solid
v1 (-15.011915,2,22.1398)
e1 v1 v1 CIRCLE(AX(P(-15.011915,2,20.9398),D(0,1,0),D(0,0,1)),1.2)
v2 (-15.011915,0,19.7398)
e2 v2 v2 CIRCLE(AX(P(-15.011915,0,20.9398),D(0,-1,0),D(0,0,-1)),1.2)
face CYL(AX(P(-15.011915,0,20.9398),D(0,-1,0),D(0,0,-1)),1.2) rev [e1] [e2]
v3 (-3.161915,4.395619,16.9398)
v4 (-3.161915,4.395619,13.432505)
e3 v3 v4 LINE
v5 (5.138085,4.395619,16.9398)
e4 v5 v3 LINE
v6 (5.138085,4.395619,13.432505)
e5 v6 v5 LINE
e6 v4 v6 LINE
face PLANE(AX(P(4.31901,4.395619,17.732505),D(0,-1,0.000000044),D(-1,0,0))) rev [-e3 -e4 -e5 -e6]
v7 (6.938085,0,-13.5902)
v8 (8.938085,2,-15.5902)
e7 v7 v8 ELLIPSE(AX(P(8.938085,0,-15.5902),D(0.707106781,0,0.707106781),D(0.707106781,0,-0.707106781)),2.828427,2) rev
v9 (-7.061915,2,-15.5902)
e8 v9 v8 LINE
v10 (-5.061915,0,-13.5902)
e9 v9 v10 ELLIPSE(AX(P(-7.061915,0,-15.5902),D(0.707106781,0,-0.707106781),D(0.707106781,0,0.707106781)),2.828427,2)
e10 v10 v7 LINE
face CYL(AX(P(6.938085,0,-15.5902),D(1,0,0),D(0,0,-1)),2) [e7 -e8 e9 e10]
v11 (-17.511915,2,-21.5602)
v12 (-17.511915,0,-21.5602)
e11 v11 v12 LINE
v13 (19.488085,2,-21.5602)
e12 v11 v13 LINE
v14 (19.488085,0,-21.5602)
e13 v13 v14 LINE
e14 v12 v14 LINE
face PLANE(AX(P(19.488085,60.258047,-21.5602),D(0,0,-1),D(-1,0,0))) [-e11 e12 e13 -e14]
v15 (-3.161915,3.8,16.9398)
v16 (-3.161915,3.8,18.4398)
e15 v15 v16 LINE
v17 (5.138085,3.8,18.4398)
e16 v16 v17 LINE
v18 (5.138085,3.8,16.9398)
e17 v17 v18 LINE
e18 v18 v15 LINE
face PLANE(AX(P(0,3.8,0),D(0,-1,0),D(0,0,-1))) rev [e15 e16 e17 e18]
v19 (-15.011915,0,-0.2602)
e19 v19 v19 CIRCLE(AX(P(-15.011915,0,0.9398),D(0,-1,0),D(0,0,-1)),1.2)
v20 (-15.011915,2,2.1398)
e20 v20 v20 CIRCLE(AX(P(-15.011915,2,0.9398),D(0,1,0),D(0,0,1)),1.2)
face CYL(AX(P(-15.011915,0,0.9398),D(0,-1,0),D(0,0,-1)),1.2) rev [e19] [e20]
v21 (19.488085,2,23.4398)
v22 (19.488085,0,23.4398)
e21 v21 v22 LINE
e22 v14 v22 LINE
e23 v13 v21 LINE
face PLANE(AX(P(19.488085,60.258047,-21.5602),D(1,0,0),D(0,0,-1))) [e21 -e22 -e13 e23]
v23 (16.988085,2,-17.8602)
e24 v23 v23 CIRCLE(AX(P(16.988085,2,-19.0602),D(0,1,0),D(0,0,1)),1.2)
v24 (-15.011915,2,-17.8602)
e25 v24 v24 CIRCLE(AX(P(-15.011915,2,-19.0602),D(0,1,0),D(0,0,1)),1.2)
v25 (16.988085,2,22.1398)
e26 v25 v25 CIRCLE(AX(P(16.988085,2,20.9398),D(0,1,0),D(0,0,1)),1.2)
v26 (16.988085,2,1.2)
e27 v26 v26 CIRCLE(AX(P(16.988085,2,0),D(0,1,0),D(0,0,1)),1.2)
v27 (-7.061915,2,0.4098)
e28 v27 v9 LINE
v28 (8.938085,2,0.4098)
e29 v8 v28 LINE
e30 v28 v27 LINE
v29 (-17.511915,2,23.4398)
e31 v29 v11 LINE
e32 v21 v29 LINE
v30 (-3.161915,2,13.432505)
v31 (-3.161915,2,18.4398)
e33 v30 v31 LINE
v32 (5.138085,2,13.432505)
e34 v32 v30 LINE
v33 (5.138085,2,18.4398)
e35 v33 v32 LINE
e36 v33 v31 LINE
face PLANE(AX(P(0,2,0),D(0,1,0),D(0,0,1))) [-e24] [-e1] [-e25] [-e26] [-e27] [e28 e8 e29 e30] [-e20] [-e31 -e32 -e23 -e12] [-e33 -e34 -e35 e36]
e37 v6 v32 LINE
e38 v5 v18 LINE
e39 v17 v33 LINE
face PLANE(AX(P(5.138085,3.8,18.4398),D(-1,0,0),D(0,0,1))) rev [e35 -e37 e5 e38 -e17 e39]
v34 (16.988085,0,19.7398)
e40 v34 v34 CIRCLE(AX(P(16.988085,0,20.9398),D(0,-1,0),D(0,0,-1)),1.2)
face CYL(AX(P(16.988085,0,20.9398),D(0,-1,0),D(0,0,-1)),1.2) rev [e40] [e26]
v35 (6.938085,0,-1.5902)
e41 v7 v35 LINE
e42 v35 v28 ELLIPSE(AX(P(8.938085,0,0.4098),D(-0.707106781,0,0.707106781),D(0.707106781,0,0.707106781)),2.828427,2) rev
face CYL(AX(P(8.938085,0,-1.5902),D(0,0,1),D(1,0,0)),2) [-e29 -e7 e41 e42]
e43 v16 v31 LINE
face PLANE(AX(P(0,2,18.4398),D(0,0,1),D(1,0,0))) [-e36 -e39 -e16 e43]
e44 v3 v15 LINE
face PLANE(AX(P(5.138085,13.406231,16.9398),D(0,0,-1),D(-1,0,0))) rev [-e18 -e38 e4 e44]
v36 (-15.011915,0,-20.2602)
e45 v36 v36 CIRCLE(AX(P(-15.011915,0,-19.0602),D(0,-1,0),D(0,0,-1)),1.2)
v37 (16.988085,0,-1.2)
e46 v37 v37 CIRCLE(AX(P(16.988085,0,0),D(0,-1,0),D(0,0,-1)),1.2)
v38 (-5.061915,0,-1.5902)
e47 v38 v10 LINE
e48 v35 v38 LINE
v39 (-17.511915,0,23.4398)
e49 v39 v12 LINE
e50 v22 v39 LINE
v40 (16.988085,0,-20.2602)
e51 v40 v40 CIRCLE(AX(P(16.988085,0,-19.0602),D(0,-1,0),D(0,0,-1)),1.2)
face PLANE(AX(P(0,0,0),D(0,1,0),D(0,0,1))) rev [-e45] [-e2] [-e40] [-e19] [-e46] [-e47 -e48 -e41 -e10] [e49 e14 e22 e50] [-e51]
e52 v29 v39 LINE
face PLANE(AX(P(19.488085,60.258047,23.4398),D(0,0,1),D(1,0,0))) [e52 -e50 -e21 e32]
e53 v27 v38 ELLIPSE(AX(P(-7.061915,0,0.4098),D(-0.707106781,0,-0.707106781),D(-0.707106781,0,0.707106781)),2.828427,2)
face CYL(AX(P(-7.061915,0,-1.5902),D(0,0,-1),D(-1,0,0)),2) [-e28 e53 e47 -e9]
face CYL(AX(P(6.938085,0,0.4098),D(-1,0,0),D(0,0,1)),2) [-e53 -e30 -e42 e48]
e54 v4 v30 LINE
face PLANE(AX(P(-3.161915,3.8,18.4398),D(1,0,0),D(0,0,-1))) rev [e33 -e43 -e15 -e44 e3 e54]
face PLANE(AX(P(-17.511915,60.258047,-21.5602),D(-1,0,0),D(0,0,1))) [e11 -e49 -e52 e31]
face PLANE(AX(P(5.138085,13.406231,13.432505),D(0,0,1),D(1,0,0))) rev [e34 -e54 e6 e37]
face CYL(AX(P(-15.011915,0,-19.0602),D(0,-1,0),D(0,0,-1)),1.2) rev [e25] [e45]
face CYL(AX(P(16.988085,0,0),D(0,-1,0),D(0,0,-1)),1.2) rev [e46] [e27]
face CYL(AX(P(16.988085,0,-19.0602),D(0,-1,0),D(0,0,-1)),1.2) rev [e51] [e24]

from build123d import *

# Parameters (mm, degrees)
SKETCH1_W            = 27
SKETCH1_H            = 35
SKETCH1_R            = 1.113712744
SKETCH1_R_2          = 1.000106258
SKETCH1_R_3          = 1.174626552
SKETCH1_R_4          = 1.19920455
SKETCH1_W_2          = 8.3
SKETCH1_H_2          = 2.12
BOSS_EXTRUDE1_DEPTH  = 2
CUT_EXTRUDE2_REACH   = 25.536
SKETCH10_W           = 12
SKETCH10_H           = 12
FILLET1_R            = 2
SKETCH12_W           = 8.3
SKETCH12_H           = 1.5
BOSS_EXTRUDE5_DEPTH  = 1.8
SKETCH13_W           = 8.3
SKETCH13_H           = 3.507295064
BOSS_EXTRUDE6_DEPTH  = 2.395619389
SKETCH14_W           = 37
SKETCH14_H           = 45
SKETCH14_W_2         = 27
SKETCH14_H_2         = 35
BOSS_EXTRUDE7_DEPTH  = 2
M2_CLEARANCE_HOLE3_D = 2.4


with BuildPart() as part:
    # Sketch1 → Boss-Extrude1 (new body)
    # profile 1 of 8: a face of its own
    with BuildSketch(Plane(origin=(0, 0, 0), x_dir=(1, 0, 0), z_dir=(0, 1, 0))):
        with Locations((0.988085162, -0.939800033)):
            Rectangle(SKETCH1_W, SKETCH1_H)
        Polygon((-10.011914838, -15.939800033), (-10.011914838, 14.060199967), (11.988085162, 14.060199967), (11.988085162, -15.939800033), (5.138085162, -15.939800033), (5.138085162, -18.059800033), (-3.161914838, -18.059800033), (-3.161914838, -15.939800033), align=None, mode=Mode.SUBTRACT)
    # profile 2 of 8: a face of its own
    with BuildSketch(Plane(origin=(0, 0, 0), x_dir=(1, 0, 0), z_dir=(0, 1, 0))):
        Polygon((11.988085162, 14.060199967), (-10.011914838, 14.060199967), (-10.011914838, -15.939800033), (-3.161914838, -15.939800033), (-3.161914838, -13.819800033), (5.138085162, -13.819800033), (5.138085162, -15.939800033), (11.988085162, -15.939800033), align=None)
        with Locations((-8.011914838, -13.939800033)):
            Circle(SKETCH1_R, mode=Mode.SUBTRACT)
        with Locations((9.988085162, -14.291814947)):
            Circle(SKETCH1_R_2, mode=Mode.SUBTRACT)
        with Locations((-8.011914838, 7.560199967)):
            Circle(SKETCH1_R_3, mode=Mode.SUBTRACT)
        with Locations((9.988085162, 7.560199967)):
            Circle(SKETCH1_R_4, mode=Mode.SUBTRACT)
    # profile 3 of 8: a face of its own
    with BuildSketch(Plane(origin=(0, 0, 0), x_dir=(1, 0, 0), z_dir=(0, 1, 0))):
        with Locations((-8.011914838, 7.560199967)):
            Circle(SKETCH1_R_3)
    # profile 4 of 8: a face of its own
    with BuildSketch(Plane(origin=(0, 0, 0), x_dir=(1, 0, 0), z_dir=(0, 1, 0))):
        with Locations((9.988085162, 7.560199967)):
            Circle(SKETCH1_R_4)
    # profile 5 of 8: a face of its own
    with BuildSketch(Plane(origin=(0, 0, 0), x_dir=(1, 0, 0), z_dir=(0, 1, 0))):
        with Locations((9.988085162, -14.291814947)):
            Circle(SKETCH1_R_2)
    # profile 6 of 8: a face of its own
    with BuildSketch(Plane(origin=(0, 0, 0), x_dir=(1, 0, 0), z_dir=(0, 1, 0))):
        with Locations((0.988085162, -16.999800033)):
            Rectangle(SKETCH1_W_2, SKETCH1_H_2)
    # profile 7 of 8: a face of its own
    with BuildSketch(Plane(origin=(0, 0, 0), x_dir=(1, 0, 0), z_dir=(0, 1, 0))):
        with Locations((0.988085162, -14.879800033)):
            Rectangle(SKETCH1_W_2, SKETCH1_H_2)
    # profile 8 of 8: a face of its own
    with BuildSketch(Plane(origin=(0, 0, 0), x_dir=(1, 0, 0), z_dir=(0, 1, 0))):
        with Locations((-8.011914838, -13.939800033)):
            Circle(SKETCH1_R)
    extrude(amount=BOSS_EXTRUDE1_DEPTH)

    # Sketch10 → Cut-Extrude2 (cut, up to next)
    with BuildSketch(Plane(origin=(0, 2, 0), x_dir=(1, 0, 0), z_dir=(0, 1, 0)), mode=Mode.PRIVATE) as cut_extrude2_sk1:
        with Locations((0.938085162, 7.590199967)):
            Rectangle(SKETCH10_W, SKETCH10_H)
    cut_extrude2_tool1 = extrude(cut_extrude2_sk1.sketch, amount=-CUT_EXTRUDE2_REACH, mode=Mode.PRIVATE) & part.part
    add(cut_extrude2_tool1.solids().sort_by_distance((0.938085, 2, -7.5902))[0], mode=Mode.SUBTRACT)

    # Fillet1
    fillet1_edges = [part.edges().sort_by_distance(p)[0] for p in [
        (0.938085162, 2, -13.590199967),
        (6.938085162, 2, -7.590199967),
        (0.938085162, 2, -1.590199967),
        (-5.061914838, 2, -7.590199967),
    ]]
    fillet(fillet1_edges, radius=FILLET1_R - 0.0001)  # a hair under: the kernel refuses the full size

    # Sketch12 → Boss-Extrude5 (add)
    with BuildSketch(Plane(origin=(0, 2, 0), x_dir=(1, 0, 0), z_dir=(0, 1, 0))):
        with Locations((0.988085162, -17.689800033)):
            Rectangle(SKETCH12_W, SKETCH12_H)
    extrude(amount=BOSS_EXTRUDE5_DEPTH)

    # Sketch13 → Boss-Extrude6 (add)
    with BuildSketch(Plane(origin=(0, 2, 0), x_dir=(1, 0, 0), z_dir=(0, 1, 0))):
        with Locations((0.988085162, -15.186152501)):
            Rectangle(SKETCH13_W, SKETCH13_H)
    extrude(amount=BOSS_EXTRUDE6_DEPTH)

    # Sketch14 → Boss-Extrude7 (add)
    with BuildSketch(Plane.XZ):
        with Locations((0.988085162, 0.939800033)):
            Rectangle(SKETCH14_W, SKETCH14_H)
        with Locations((0.988085162, 0.939800033)):
            Rectangle(SKETCH14_W_2, SKETCH14_H_2, mode=Mode.SUBTRACT)
    extrude(amount=-BOSS_EXTRUDE7_DEPTH)

    # M2 Clearance Hole3 (through all)
    with Locations(Plane(origin=(0, 0, 0), x_dir=(-1, 0, 0), z_dir=(0, -1, 0))):
        with Locations((-16.988085162, 19.060199967), (15.011914838, 19.060199967), (15.011914838, -0.939800033), (15.011914838, -20.939800033), (-16.988085162, -20.939800033), (-16.988085162, -1.8e-07)):
            Hole(M2_CLEARANCE_HOLE3_D / 2)


solid = part.part
